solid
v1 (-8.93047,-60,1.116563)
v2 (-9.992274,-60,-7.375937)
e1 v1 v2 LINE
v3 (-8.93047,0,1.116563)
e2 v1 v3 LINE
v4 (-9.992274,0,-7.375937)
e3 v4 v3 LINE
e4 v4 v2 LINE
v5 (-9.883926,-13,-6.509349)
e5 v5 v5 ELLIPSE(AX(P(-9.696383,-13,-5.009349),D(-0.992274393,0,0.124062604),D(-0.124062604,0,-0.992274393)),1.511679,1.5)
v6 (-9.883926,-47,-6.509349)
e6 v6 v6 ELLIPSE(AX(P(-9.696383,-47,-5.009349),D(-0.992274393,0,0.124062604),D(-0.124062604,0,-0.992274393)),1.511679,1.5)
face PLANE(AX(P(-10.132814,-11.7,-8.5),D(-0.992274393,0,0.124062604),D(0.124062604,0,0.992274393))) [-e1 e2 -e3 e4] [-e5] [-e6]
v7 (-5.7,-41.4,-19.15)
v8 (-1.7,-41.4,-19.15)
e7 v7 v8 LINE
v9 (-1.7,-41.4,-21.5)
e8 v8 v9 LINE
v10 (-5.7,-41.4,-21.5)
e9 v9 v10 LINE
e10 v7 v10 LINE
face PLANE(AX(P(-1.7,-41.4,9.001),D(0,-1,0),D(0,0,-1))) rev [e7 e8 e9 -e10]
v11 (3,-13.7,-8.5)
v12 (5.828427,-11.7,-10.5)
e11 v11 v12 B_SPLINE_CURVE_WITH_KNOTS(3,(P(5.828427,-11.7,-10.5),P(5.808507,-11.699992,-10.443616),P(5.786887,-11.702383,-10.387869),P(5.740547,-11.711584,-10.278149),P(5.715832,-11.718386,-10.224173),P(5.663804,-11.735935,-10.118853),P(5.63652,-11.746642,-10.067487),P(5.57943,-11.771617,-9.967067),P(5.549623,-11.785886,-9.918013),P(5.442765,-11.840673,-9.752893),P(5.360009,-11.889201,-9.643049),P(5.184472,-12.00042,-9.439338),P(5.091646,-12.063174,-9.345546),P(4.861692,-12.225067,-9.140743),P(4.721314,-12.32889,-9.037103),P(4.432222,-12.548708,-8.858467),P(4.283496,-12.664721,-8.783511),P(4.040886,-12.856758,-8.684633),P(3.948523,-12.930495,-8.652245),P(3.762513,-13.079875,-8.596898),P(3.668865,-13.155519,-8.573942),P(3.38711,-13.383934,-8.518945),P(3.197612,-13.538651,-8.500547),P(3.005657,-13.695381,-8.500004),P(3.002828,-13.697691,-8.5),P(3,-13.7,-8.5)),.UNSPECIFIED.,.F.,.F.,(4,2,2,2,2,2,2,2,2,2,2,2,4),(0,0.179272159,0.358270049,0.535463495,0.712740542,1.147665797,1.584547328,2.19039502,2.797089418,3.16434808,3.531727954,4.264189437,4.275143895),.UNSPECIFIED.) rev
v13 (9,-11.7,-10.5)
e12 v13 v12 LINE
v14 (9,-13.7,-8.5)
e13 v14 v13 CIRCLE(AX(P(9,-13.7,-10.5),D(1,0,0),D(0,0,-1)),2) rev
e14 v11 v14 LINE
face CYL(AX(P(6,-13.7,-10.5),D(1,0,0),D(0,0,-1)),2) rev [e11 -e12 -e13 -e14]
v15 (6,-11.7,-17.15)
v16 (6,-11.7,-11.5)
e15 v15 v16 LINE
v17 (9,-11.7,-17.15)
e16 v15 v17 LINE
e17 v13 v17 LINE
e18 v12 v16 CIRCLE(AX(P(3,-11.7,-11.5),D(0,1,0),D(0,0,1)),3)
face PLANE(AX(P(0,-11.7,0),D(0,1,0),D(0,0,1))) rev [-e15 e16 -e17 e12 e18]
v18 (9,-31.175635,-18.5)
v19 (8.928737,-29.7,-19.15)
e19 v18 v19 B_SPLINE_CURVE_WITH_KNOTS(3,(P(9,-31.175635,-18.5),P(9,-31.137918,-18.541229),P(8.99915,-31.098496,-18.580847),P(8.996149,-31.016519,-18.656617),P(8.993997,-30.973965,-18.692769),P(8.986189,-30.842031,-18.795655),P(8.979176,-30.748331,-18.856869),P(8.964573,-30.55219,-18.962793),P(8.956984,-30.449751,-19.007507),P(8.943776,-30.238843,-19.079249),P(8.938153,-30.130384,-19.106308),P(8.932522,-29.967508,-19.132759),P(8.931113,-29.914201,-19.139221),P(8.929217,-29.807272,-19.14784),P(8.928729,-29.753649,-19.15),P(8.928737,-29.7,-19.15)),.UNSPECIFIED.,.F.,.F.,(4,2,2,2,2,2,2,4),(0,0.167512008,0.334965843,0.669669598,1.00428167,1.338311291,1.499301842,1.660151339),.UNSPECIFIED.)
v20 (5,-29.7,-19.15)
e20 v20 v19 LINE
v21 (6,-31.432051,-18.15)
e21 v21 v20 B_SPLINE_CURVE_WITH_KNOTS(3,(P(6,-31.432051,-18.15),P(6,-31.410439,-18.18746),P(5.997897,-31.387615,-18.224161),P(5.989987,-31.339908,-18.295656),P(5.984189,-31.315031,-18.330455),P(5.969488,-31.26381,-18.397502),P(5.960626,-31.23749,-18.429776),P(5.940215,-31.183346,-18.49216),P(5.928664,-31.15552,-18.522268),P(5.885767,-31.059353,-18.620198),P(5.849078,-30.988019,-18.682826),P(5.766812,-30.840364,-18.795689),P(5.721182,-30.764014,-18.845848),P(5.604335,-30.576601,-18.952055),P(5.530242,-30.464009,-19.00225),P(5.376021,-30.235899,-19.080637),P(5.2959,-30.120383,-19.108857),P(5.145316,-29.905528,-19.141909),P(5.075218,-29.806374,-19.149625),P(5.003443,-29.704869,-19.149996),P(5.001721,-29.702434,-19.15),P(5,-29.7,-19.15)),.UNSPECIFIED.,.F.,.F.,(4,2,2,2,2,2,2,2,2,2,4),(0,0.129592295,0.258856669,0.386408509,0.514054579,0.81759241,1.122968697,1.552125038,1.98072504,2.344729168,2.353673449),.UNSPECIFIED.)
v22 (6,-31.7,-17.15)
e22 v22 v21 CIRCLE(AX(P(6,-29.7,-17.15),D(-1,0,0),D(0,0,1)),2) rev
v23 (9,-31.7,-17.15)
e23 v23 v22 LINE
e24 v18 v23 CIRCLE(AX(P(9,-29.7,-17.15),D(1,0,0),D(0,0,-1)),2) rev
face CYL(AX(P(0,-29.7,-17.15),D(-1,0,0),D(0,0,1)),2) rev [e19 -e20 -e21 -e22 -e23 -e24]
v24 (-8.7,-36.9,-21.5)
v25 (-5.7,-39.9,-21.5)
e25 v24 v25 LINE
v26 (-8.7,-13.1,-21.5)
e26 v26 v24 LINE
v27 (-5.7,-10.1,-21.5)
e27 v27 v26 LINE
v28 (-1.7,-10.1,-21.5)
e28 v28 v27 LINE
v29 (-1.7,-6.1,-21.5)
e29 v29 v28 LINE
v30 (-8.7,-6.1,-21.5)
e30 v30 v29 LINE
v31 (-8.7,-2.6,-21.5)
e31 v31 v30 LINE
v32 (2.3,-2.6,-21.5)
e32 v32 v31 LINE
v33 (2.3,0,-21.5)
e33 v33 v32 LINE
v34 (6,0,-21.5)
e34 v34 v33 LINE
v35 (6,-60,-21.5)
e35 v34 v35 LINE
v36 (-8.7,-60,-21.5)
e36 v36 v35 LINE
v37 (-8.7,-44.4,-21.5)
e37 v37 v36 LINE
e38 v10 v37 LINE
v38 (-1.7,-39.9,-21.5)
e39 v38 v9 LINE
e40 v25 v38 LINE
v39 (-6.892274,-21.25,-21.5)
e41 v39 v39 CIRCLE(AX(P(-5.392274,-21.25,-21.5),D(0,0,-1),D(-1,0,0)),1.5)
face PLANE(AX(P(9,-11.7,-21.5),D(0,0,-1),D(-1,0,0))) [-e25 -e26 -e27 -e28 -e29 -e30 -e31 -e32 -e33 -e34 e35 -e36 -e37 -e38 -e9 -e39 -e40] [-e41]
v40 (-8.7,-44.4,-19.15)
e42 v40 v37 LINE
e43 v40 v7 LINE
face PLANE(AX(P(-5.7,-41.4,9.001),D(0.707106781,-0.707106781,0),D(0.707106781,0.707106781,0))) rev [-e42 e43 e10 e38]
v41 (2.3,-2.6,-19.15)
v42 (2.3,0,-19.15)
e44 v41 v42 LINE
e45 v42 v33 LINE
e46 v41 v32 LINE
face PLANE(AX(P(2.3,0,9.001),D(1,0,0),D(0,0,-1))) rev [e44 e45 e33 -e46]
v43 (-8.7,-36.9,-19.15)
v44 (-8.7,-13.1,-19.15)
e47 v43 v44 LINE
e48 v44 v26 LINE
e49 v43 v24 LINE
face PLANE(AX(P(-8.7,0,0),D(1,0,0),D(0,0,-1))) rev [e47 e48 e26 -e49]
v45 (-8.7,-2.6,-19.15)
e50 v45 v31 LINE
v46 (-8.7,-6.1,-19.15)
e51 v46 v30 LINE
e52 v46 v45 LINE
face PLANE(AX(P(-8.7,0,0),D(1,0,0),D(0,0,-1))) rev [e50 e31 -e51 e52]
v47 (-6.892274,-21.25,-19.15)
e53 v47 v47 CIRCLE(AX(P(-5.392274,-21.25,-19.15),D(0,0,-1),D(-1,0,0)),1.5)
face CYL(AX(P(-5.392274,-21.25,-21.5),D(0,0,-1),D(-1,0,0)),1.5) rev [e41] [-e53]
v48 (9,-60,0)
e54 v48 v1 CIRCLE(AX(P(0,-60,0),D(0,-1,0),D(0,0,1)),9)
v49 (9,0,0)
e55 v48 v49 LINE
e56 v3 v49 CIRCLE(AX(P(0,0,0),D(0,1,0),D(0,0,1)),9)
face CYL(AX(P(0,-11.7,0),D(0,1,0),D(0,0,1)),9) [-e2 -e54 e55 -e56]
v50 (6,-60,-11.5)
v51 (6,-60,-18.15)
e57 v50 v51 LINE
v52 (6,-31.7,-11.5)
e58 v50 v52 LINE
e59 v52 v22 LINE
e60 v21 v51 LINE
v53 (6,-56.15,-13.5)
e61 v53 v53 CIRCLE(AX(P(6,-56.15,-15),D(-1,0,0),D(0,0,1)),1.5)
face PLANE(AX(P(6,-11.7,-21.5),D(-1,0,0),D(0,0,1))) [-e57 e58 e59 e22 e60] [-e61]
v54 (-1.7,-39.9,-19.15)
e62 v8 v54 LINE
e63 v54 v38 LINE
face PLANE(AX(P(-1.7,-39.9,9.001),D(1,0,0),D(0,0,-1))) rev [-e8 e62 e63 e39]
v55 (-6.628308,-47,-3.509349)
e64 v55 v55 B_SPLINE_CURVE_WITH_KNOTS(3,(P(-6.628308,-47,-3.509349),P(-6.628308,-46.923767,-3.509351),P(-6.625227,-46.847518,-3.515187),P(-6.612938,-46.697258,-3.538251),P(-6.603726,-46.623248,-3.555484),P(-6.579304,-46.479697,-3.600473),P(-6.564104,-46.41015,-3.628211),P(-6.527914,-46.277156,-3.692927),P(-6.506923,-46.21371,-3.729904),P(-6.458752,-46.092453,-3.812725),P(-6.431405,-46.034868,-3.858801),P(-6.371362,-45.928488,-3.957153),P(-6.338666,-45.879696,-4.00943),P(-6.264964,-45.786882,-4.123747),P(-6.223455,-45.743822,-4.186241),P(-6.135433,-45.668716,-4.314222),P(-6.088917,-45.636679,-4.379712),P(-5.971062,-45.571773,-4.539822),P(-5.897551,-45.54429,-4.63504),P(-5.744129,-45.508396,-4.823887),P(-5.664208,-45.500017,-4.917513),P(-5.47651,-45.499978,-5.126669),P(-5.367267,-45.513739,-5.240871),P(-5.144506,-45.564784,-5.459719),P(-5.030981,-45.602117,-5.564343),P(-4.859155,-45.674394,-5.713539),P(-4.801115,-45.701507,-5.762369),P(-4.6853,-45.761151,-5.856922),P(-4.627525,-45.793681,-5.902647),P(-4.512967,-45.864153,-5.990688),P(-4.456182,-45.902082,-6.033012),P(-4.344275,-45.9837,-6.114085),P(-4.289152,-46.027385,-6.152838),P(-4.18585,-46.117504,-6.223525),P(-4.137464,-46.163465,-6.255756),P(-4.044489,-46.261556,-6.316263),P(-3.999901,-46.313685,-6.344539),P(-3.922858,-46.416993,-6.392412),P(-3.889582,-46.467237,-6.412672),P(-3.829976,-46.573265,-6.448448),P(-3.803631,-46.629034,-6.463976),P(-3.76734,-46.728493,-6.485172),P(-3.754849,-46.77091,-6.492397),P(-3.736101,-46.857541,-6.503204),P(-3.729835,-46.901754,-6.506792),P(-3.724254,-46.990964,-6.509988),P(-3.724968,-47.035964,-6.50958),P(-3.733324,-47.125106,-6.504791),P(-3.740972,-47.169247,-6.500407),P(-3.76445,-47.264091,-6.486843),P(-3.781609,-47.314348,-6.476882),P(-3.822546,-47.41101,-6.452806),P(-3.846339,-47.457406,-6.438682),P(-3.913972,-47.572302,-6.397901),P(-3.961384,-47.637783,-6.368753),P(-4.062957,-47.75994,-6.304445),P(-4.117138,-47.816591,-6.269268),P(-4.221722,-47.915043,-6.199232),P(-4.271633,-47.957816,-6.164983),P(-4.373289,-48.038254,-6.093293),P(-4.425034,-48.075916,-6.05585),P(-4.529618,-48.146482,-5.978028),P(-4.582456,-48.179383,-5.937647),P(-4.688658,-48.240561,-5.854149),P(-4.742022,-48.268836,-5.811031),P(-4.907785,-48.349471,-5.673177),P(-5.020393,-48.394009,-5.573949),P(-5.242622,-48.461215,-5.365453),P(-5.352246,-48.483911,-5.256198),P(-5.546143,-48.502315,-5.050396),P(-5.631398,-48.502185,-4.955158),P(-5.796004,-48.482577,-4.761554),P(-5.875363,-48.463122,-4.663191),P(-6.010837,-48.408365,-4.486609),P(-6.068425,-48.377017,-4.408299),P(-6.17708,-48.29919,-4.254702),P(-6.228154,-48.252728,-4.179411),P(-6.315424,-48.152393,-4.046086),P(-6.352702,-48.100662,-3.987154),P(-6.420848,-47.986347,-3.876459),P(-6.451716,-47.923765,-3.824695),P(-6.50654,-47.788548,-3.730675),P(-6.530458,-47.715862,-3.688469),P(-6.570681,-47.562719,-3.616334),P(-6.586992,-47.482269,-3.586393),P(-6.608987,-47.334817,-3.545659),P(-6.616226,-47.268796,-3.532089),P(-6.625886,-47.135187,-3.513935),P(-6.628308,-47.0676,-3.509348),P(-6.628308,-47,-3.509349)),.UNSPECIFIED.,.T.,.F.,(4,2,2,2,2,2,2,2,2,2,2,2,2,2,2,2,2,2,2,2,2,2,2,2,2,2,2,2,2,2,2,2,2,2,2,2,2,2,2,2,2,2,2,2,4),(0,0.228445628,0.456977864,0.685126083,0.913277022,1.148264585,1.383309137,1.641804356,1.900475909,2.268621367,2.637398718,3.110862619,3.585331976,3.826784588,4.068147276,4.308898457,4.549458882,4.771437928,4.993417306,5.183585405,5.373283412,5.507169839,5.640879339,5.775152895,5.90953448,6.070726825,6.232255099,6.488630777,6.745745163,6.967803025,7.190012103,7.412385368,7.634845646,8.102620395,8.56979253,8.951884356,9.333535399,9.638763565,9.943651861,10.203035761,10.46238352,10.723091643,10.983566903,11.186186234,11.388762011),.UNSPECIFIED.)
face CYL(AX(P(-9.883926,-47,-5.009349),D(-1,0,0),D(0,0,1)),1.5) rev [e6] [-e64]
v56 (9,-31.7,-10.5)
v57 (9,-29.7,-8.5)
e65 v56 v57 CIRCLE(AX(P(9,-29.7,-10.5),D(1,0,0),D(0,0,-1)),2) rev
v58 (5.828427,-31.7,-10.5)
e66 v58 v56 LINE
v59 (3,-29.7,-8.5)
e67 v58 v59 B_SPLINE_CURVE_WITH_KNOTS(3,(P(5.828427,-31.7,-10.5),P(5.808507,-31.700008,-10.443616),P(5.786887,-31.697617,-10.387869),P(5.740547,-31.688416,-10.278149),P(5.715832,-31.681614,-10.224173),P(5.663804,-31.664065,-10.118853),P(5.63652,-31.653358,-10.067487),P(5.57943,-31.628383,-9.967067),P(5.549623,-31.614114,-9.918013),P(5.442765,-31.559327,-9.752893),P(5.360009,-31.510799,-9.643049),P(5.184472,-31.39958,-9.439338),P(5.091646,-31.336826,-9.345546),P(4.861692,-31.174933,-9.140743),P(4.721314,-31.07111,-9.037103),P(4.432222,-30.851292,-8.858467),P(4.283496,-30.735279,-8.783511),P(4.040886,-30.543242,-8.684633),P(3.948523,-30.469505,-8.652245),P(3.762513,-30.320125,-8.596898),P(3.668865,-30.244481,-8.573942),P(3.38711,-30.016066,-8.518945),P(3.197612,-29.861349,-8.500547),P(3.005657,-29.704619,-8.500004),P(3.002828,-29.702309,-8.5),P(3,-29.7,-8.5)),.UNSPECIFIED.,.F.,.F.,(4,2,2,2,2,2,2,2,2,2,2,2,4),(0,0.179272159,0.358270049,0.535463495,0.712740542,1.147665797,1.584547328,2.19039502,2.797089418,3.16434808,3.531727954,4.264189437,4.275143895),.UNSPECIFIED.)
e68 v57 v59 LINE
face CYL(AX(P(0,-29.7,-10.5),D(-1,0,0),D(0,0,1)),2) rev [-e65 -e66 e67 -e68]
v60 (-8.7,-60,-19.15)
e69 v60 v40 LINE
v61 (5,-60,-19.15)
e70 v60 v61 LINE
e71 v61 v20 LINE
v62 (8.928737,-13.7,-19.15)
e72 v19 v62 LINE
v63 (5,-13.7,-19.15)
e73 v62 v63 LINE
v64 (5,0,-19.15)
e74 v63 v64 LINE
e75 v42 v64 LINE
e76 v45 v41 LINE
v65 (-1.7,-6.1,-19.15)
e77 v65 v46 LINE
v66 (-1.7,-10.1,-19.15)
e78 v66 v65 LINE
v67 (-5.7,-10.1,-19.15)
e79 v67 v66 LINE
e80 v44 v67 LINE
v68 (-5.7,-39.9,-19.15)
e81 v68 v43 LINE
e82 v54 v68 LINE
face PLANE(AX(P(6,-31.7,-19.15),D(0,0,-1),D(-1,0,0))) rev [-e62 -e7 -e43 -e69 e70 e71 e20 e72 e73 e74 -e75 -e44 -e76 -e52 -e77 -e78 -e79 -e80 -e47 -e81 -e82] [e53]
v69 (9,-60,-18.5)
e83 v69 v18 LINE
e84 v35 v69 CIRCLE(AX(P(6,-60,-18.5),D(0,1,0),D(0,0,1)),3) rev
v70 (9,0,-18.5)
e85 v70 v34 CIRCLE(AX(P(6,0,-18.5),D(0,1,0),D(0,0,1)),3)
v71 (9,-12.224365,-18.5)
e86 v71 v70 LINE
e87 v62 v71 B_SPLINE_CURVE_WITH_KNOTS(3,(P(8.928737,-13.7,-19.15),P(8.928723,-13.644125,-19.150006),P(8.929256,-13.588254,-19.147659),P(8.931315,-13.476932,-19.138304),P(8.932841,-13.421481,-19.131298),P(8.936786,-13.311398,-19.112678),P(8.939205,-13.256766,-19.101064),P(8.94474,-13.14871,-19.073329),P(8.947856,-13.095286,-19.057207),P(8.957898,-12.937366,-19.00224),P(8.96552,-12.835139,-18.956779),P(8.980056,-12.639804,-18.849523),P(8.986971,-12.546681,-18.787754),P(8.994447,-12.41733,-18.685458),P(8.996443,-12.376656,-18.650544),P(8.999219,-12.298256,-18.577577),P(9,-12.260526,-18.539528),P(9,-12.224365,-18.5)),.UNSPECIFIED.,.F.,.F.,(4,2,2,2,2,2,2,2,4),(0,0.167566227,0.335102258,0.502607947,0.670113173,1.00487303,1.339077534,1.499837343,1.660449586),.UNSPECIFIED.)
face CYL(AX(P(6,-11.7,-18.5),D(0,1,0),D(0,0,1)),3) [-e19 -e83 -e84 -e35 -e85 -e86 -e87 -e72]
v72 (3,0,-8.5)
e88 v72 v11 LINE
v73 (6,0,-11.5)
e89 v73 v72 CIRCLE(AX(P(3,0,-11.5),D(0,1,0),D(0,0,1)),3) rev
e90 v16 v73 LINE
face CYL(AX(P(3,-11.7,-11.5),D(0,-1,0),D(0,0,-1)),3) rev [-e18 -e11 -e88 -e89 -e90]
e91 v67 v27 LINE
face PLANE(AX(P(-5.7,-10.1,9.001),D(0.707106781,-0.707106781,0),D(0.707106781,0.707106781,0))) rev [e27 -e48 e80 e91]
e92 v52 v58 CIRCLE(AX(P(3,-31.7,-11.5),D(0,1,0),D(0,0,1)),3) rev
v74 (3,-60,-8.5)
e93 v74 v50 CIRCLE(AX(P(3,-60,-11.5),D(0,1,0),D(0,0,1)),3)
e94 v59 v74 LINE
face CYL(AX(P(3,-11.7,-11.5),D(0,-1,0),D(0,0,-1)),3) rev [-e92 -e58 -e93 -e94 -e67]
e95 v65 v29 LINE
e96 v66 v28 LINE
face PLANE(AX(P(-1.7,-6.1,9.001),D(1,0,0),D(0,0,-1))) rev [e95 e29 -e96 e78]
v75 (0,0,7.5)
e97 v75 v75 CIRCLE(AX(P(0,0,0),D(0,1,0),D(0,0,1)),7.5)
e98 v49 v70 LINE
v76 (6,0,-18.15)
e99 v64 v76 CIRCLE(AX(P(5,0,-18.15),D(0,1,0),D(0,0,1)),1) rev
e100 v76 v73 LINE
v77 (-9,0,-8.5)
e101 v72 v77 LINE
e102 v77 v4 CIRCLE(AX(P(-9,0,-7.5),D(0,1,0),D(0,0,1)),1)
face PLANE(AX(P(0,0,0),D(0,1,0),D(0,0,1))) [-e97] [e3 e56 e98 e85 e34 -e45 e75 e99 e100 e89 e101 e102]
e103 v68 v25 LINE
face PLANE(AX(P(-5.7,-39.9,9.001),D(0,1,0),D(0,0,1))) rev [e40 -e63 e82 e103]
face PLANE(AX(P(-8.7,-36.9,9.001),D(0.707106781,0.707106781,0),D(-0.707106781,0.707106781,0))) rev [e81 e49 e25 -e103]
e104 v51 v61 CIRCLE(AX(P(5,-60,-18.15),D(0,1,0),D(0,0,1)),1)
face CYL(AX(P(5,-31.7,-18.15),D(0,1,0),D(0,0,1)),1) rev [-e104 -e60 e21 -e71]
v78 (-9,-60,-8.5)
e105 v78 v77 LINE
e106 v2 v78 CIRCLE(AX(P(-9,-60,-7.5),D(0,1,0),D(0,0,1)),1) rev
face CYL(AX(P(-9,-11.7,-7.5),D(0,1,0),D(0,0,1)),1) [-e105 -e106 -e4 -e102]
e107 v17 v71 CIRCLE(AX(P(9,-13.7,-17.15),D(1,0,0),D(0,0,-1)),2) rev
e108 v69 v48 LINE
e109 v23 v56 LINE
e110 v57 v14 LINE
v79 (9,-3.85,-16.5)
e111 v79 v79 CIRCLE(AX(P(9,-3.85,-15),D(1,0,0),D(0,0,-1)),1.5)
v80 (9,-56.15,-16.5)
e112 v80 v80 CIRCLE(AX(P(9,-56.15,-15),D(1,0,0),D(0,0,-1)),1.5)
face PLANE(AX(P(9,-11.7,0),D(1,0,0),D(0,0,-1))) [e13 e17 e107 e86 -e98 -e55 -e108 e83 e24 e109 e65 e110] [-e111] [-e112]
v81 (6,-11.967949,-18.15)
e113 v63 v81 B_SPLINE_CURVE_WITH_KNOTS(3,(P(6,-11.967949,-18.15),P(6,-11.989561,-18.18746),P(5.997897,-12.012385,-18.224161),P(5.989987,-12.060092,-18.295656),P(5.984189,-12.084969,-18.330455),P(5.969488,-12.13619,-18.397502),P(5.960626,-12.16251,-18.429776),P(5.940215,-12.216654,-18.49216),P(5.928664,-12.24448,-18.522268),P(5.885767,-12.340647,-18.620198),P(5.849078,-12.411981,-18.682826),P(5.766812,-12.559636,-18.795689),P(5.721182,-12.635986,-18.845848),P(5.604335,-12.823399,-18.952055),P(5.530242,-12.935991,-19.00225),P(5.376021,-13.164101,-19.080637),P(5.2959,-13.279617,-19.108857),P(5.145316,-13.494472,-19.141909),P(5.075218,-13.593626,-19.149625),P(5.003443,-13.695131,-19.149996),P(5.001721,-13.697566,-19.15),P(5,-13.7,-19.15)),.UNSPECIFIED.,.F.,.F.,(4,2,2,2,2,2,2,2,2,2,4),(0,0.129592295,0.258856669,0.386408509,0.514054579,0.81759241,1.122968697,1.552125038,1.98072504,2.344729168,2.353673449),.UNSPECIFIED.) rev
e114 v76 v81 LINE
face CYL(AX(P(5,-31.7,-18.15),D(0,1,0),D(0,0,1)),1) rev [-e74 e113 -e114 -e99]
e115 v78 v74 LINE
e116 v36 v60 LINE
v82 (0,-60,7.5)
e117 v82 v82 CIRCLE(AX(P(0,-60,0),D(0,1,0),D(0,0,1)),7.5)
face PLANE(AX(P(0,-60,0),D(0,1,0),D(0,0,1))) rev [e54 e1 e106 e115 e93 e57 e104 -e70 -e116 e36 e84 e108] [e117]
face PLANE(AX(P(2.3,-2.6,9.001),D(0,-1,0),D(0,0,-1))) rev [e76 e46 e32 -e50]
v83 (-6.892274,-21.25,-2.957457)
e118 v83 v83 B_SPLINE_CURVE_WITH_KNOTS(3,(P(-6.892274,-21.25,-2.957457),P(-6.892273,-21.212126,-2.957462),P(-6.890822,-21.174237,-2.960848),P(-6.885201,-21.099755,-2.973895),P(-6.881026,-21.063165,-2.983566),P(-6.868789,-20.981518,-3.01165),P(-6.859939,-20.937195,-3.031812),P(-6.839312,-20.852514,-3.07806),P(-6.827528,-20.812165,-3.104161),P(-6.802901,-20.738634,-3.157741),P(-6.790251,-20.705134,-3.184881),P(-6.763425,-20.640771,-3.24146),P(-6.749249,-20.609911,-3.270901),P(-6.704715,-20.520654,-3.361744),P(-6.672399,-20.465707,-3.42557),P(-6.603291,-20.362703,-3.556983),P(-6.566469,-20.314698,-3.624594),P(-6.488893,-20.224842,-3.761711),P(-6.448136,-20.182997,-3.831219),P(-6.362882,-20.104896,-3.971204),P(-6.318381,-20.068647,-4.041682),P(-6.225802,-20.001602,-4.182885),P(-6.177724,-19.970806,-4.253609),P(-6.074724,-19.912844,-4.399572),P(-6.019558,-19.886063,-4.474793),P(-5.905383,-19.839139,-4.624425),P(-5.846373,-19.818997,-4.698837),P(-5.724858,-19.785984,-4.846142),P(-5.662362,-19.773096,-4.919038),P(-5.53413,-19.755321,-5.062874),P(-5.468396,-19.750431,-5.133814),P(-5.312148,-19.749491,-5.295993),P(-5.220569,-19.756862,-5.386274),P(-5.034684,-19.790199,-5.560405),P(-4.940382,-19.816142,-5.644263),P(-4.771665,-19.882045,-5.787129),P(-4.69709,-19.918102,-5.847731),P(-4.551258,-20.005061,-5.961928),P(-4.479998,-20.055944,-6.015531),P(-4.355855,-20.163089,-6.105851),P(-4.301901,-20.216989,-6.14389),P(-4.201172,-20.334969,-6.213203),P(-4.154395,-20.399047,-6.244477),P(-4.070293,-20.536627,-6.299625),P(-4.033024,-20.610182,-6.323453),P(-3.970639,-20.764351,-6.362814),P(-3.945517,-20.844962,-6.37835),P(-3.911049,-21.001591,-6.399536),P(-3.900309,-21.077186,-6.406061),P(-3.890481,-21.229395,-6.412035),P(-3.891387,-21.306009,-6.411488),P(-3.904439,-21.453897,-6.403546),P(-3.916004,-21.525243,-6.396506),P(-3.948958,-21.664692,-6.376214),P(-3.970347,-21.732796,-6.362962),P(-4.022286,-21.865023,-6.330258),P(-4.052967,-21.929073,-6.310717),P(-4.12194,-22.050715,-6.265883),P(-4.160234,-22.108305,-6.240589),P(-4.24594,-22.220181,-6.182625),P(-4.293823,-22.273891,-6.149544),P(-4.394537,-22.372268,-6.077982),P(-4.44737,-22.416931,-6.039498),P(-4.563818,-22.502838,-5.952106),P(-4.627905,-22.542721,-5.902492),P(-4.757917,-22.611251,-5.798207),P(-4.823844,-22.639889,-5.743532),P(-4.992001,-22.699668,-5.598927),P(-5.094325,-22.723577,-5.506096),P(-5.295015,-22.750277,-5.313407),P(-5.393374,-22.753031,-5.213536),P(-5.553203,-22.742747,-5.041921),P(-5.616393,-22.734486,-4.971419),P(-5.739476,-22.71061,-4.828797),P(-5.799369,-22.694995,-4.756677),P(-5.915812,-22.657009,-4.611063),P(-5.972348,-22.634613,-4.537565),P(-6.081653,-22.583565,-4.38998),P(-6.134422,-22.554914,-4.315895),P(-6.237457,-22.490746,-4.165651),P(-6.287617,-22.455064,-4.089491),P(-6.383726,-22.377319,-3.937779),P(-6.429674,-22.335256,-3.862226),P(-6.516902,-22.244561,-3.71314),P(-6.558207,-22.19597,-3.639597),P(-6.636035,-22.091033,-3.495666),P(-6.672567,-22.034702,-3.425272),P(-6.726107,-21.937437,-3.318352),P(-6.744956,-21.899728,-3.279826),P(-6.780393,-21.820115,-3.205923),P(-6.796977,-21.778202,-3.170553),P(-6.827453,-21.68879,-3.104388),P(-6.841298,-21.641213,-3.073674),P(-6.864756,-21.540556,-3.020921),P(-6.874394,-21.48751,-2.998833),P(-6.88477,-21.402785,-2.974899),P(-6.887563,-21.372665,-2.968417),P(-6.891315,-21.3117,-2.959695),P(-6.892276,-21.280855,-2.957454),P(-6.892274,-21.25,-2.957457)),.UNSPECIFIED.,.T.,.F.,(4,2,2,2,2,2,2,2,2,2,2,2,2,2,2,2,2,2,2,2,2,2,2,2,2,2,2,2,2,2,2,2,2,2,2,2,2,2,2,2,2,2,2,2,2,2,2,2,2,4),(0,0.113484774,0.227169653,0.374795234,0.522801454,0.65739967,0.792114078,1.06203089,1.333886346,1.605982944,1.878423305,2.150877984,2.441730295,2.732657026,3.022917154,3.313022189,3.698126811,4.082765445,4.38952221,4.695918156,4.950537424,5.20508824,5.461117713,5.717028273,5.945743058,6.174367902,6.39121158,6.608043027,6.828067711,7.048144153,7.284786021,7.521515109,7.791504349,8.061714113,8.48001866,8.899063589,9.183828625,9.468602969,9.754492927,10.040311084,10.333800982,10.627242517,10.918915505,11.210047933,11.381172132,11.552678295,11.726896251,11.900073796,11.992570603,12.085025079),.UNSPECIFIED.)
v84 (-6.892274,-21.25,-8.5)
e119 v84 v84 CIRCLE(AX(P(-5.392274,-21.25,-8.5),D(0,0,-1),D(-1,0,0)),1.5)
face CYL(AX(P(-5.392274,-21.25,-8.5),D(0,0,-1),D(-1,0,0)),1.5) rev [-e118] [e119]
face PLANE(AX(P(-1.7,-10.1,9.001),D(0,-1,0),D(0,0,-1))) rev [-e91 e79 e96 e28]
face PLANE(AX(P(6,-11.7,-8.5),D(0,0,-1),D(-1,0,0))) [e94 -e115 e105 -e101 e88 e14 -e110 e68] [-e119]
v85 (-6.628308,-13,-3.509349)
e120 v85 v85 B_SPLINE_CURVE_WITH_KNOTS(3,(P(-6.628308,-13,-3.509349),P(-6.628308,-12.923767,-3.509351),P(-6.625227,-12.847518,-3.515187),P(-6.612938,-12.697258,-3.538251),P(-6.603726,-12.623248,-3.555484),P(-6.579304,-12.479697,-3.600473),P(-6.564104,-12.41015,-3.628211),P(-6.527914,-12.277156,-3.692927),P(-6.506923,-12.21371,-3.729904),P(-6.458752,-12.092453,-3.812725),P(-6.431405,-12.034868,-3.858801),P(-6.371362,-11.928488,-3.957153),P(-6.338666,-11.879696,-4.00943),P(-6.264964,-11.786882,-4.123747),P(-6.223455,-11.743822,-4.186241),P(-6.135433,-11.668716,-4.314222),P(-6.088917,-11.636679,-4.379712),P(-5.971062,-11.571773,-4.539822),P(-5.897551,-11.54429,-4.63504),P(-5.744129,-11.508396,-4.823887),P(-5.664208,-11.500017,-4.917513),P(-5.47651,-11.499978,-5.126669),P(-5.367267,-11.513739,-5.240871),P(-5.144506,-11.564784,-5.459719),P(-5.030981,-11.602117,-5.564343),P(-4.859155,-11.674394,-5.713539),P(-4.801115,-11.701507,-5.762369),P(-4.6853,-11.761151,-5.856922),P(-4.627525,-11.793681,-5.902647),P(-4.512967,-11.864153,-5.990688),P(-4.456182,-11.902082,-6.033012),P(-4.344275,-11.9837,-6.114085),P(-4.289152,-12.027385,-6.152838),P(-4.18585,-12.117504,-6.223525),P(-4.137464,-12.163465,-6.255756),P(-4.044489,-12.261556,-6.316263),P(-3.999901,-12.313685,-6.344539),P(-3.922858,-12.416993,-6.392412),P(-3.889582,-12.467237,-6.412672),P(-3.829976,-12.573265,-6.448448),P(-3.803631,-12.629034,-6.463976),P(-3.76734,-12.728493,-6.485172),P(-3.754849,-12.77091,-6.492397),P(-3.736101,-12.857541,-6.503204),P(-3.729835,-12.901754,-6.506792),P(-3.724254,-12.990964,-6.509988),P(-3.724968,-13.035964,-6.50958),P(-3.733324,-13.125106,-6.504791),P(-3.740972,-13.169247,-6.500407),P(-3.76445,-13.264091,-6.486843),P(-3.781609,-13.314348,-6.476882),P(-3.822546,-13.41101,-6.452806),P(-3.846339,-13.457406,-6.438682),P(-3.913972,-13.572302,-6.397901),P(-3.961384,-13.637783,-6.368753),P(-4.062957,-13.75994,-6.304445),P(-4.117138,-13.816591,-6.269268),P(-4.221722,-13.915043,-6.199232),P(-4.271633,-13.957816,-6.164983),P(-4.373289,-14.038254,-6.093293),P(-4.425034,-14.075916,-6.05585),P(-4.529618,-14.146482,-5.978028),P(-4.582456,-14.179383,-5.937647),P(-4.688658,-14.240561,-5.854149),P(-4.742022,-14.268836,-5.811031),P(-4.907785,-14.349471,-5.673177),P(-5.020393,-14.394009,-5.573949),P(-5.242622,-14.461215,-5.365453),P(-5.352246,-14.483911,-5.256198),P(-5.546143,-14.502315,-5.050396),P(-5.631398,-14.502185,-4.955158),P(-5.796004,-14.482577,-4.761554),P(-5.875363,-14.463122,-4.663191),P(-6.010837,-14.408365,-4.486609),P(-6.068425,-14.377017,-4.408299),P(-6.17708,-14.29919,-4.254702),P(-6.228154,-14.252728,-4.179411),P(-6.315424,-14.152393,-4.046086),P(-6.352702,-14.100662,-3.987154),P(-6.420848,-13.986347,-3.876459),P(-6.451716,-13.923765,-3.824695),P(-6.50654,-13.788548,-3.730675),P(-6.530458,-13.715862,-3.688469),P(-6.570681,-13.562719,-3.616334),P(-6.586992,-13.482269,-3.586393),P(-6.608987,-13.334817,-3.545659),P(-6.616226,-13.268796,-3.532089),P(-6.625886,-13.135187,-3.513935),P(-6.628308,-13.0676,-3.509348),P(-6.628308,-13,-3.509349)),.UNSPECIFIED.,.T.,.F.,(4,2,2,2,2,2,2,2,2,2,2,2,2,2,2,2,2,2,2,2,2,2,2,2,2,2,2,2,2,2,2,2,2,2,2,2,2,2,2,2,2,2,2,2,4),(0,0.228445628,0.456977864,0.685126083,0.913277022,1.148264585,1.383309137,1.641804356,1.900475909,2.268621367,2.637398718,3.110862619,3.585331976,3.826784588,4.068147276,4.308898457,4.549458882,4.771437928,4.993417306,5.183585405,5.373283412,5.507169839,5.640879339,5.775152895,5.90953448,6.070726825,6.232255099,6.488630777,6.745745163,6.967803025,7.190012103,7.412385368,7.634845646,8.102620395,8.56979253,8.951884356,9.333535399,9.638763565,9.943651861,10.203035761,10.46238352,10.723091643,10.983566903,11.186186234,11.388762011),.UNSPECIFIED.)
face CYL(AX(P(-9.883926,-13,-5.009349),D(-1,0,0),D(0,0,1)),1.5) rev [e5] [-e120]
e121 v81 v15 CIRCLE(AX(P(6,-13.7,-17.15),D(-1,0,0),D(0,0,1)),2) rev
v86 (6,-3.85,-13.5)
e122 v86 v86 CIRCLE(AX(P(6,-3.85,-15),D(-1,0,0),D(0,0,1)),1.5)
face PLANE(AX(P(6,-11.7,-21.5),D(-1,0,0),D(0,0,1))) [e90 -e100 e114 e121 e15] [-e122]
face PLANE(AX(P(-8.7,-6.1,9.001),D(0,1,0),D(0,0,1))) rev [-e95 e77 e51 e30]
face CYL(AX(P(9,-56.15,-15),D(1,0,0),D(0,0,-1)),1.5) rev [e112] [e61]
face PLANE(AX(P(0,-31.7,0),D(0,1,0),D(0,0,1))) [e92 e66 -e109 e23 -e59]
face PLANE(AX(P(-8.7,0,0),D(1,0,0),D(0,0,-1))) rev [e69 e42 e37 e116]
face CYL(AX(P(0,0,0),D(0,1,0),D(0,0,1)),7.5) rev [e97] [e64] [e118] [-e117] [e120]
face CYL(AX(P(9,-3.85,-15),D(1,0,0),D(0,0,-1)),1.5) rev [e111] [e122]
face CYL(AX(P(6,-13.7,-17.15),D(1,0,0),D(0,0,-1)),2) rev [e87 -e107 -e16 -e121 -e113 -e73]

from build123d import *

# Parameters (mm, degrees)
EXTRUDE_1_DEPTH            = 11.7
EXTRUDE_2_DEPTH            = 20
SKETCH_3_W                 = 3
SKETCH_3_H                 = 2.35
EXTRUDE_3_DEPTH            = 20
EXTRUDE_4_DEPTH            = 28.3
SKETCH_5_W                 = 2.35
SKETCH_5_H                 = 60
EXTRUDE_5_DEPTH            = 14.7
CUT_EXTRUDE_1_REACH        = 70.066
SKETCH_6_W                 = 11
SKETCH_6_H                 = 2.6
CUT_EXTRUDE_2_REACH        = 70.066
CUT_EXTRUDE_3_REACH        = 70.066
HOLE_WIZARD_3_0_3_1_D      = 3
HOLE_WIZARD_3_0_3_1_DEPTH  = 19.132814283
HOLE_WIZARD_3_0_3_2_D      = 3
HOLE_WIZARD_3_0_3_2_DEPTH  = 2.35
HOLE_WIZARD_15_0_15_1_D    = 15
HOLE_WIZARD_3_0_3_3_REACH  = 65.316
HOLE_WIZARD_3_0_3_3_BORE_R = 1.5
HOLE_WIZARD_3_0_3_4_REACH  = 68.474
HOLE_WIZARD_3_0_3_4_BORE_R = 1.5
FILLET_1_R                 = 1
FILLET_2_R                 = 2
FILLET_START               = 2.9999999
FILLET_3_DEPTH             = 3.0000001
FILLET_START_2             = -60
FILLET_3_2_DEPTH           = 60


with BuildPart() as part:
    # Эскиз1 → Бобышка-Вытянуть1 (new body)
    with BuildSketch(Plane(origin=(0, 0, 0), x_dir=(1, 0, 0), z_dir=(0, 1, 0))):
        with BuildLine():
            Line((9, 21.5), (6, 21.5))
            Line((6, 21.5), (6, 8.5))
            Line((6, 8.5), (-10.132814283, 8.5))
            Line((-10.132814283, 8.5), (-8.930469533, -1.11656344))
            ThreePointArc((-8.930469533, -1.11656344), (0.55936312, -8.982600564), (9, 0))
            Line((9, 0), (9, 21.5))
        make_face()
    extrude(amount=-EXTRUDE_1_DEPTH)

    # Эскиз2 → Бобышка-Вытянуть2 (add)
    with BuildSketch(Plane.XZ.offset(11.7)):
        with BuildLine():
            Line((9, -8.5), (-10.132814283, -8.5))
            Line((-10.132814283, -8.5), (-8.930469533, 1.11656344))
            ThreePointArc((-8.930469533, 1.11656344), (0.55936312, 8.982600564), (9, 0))
            Line((9, 0), (9, -8.5))
        make_face()
    extrude(amount=EXTRUDE_2_DEPTH)

    # Эскиз3 → Бобышка-Вытянуть3 (add)
    with BuildSketch(Plane.XZ.offset(11.7)):
        with Locations((7.5, -20.325)):
            Rectangle(SKETCH_3_W, SKETCH_3_H)
    extrude(amount=EXTRUDE_3_DEPTH)

    # Эскиз4 → Бобышка-Вытянуть4 (add)
    with BuildSketch(Plane.XZ.offset(31.7)):
        with BuildLine():
            Line((6, -21.5), (6, -8.5))
            Line((6, -8.5), (-10.132814283, -8.5))
            Line((-10.132814283, -8.5), (-8.930469533, 1.11656344))
            ThreePointArc((-8.930469533, 1.11656344), (0.55936312, 8.982600564), (9, 0))
            Line((9, 0), (9, -21.5))
            Line((9, -21.5), (6, -21.5))
        make_face()
    extrude(amount=EXTRUDE_4_DEPTH)

    # Эскиз5 → Бобышка-Вытянуть5 (add)
    with BuildSketch(Plane.ZY.offset(-6)):
        with Locations((-20.325, -30)):
            Rectangle(SKETCH_5_W, SKETCH_5_H)
    extrude(amount=EXTRUDE_5_DEPTH)

    # Эскиз6 → Вырез-Вытянуть1 (cut, up to next)
    with BuildSketch(Plane(origin=(0, 0, -21.5), x_dir=(-1, 0, 0), z_dir=(0, 0, -1)), mode=Mode.PRIVATE) as cut_extrude_1_sk1:
        with Locations((3.2, -1.3)):
            Rectangle(SKETCH_6_W, SKETCH_6_H)
    cut_extrude_1_tool1 = extrude(cut_extrude_1_sk1.sketch, amount=-CUT_EXTRUDE_1_REACH, mode=Mode.PRIVATE) & part.part
    add(cut_extrude_1_tool1.solids().sort_by_distance((-3.2, -1.3, -21.5))[0], mode=Mode.SUBTRACT)

    # Эскиз7 → Вырез-Вытянуть2 (cut, up to next)
    with BuildSketch(Plane(origin=(0, 0, -21.5), x_dir=(-1, 0, 0), z_dir=(0, 0, -1)), mode=Mode.PRIVATE) as cut_extrude_2_sk1:
        Polygon((8.7, -13.1), (8.7, -6.1), (1.7, -6.1), (1.7, -10.1), (5.7, -10.1), align=None)
    cut_extrude_2_tool1 = extrude(cut_extrude_2_sk1.sketch, amount=-CUT_EXTRUDE_2_REACH, mode=Mode.PRIVATE) & part.part
    add(cut_extrude_2_tool1.solids().sort_by_distance((-5.546154, -8.515385, -21.5))[0], mode=Mode.SUBTRACT)

    # Эскиз8 → Вырез-Вытянуть3 (cut, up to next)
    with BuildSketch(Plane(origin=(0, 0, -21.5), x_dir=(-1, 0, 0), z_dir=(0, 0, -1)), mode=Mode.PRIVATE) as cut_extrude_3_sk1:
        Polygon((8.7, -44.4), (8.7, -36.9), (5.7, -39.9), (1.7, -39.9), (1.7, -41.4), (5.7, -41.4), align=None)
    cut_extrude_3_tool1 = extrude(cut_extrude_3_sk1.sketch, amount=-CUT_EXTRUDE_3_REACH, mode=Mode.PRIVATE) & part.part
    add(cut_extrude_3_tool1.solids().sort_by_distance((-6.353846, -40.65, -21.5))[0], mode=Mode.SUBTRACT)

    # Диаметр отверстия Ø3.0 (3)1
    with Locations(Plane(origin=(9, 0, 0), x_dir=(0, 0, -1), z_dir=(1, 0, 0))):
        with Locations((15, -3.85), (15, -56.15)):
            Hole(HOLE_WIZARD_3_0_3_1_D / 2, depth=HOLE_WIZARD_3_0_3_1_DEPTH)

    # Диаметр отверстия Ø3.0 (3)2
    with Locations(Plane(origin=(0, 0, -21.5), x_dir=(-1, 0, 0), z_dir=(0, 0, -1))):
        with Locations((5.392274393, -21.25)):
            Hole(HOLE_WIZARD_3_0_3_2_D / 2, depth=HOLE_WIZARD_3_0_3_2_DEPTH)

    # Диаметр отверстия Ø15.0 (15)1 (through all)
    with Locations(Plane(origin=(0, 0, 0), x_dir=(1, 0, 0), z_dir=(0, 1, 0))):
        with Locations((0, 0)):
            Hole(HOLE_WIZARD_15_0_15_1_D / 2)

    # Диаметр отверстия Ø3.0 (3)3 bore → Диаметр отверстия Ø3.0 (3)3 (cut, up to next)
    with BuildSketch(Plane(origin=(0, 0, -8.5), x_dir=(-1, 0, 0), z_dir=(0, 0, -1)), mode=Mode.PRIVATE) as hole_wizard_3_0_3_3_sk1:
        with Locations((5.392274393, -21.25)):
            Circle(HOLE_WIZARD_3_0_3_3_BORE_R)
    hole_wizard_3_0_3_3_tool1 = extrude(hole_wizard_3_0_3_3_sk1.sketch, amount=-HOLE_WIZARD_3_0_3_3_REACH, mode=Mode.PRIVATE) & part.part
    add(hole_wizard_3_0_3_3_tool1.solids().sort_by_distance((-5.392274, -21.25, -8.5))[0], mode=Mode.SUBTRACT)

    # Диаметр отверстия Ø3.0 (3)4 bore → Диаметр отверстия Ø3.0 (3)4 (cut, up to next)
    with BuildSketch(Plane.ZY.offset(9.883926163), mode=Mode.PRIVATE) as hole_wizard_3_0_3_4_sk1:
        with Locations((-5.009349323, -13)):
            Circle(HOLE_WIZARD_3_0_3_4_BORE_R)
    hole_wizard_3_0_3_4_tool1 = extrude(hole_wizard_3_0_3_4_sk1.sketch, amount=-HOLE_WIZARD_3_0_3_4_REACH, mode=Mode.PRIVATE) & part.part
    # Диаметр отверстия Ø3.0 (3)4 bore → Диаметр отверстия Ø3.0 (3)4 (cut, up to next)
    with BuildSketch(Plane.ZY.offset(9.883926163), mode=Mode.PRIVATE) as hole_wizard_3_0_3_4_sk2:
        with Locations((-5.009349323, -47)):
            Circle(HOLE_WIZARD_3_0_3_4_BORE_R)
    hole_wizard_3_0_3_4_tool2 = extrude(hole_wizard_3_0_3_4_sk2.sketch, amount=-HOLE_WIZARD_3_0_3_4_REACH, mode=Mode.PRIVATE) & part.part
    add(hole_wizard_3_0_3_4_tool1.solids().sort_by_distance((-9.883926, -13, -5.009349))[0], mode=Mode.SUBTRACT)
    add(hole_wizard_3_0_3_4_tool2.solids().sort_by_distance((-9.883926, -47, -5.009349))[0], mode=Mode.SUBTRACT)

    # Скругление1
    fillet_1_edges = [part.edges().sort_by_distance(p)[0] for p in [
        (-10.132814283, -30, -8.5),
        (6, -45.85, -19.15),
        (6, -5.85, -19.15),
    ]]
    fillet(fillet_1_edges, radius=FILLET_1_R)

    # Скругление2
    fillet_2_edges = [part.edges().sort_by_distance(p)[0] for p in [
        (7, -11.7, -19.15),
        (7.5, -31.7, -8.5),
        (7.5, -11.7, -8.5),
        (7, -31.7, -19.15),
    ]]
    fillet(fillet_2_edges, radius=FILLET_2_R)

    # Скругление3: read off the stored shape, not the designer's step
    # Скругление3 outline → Скругление3 (add)
    with BuildSketch(Plane.YZ.offset(FILLET_START)):
        with BuildLine():
            Line((-13.7, -19.15), (0, -19.15))
            Line((0, -19.15), (0, -8.5))
            Line((0, -8.5), (-13.7, -8.5))
            ThreePointArc((-13.7, -8.5), (-12.285786438, -9.085786438), (-11.7, -10.5))
            Line((-11.7, -10.5), (-11.7, -17.15))
            ThreePointArc((-11.7, -17.15), (-12.285786438, -18.564213562), (-13.7, -19.15))
        make_face()
        with BuildLine():
            Line((-60, -8.5), (-60, -19.15))
            Line((-60, -19.15), (-29.7, -19.15))
            ThreePointArc((-29.7, -19.15), (-31.114213562, -18.564213562), (-31.7, -17.15))
            Line((-31.7, -17.15), (-31.7, -10.5))
            ThreePointArc((-31.7, -10.5), (-31.114213562, -9.085786438), (-29.7, -8.5))
            Line((-29.7, -8.5), (-60, -8.5))
        make_face()
    extrude(amount=FILLET_3_DEPTH)

    # Fillet 3 2 outline → Fillet 3 2 (cut)
    with BuildSketch(Plane(origin=(0, 0, 0), x_dir=(1, 0, 0), z_dir=(0, 1, 0)).offset(FILLET_START_2)):
        with BuildLine():
            ThreePointArc((6, 21.5), (8.121320344, 20.621320344), (9, 18.5))
            Line((9, 18.5), (9, 21.5))
            Line((9, 21.5), (6, 21.5))
        make_face()
        with BuildLine():
            Line((6, 11.5), (6, 18.15))
            ThreePointArc((6, 18.15), (5.707106781, 18.857106781), (5, 19.15))
            Line((5, 19.15), (2.9999999, 19.15))
            Line((2.9999999, 19.15), (3, 8.5))
            ThreePointArc((3, 8.5), (5.121320344, 9.378679656), (6, 11.5))
        make_face()
    extrude(amount=FILLET_3_2_DEPTH, mode=Mode.SUBTRACT)


solid = part.part
